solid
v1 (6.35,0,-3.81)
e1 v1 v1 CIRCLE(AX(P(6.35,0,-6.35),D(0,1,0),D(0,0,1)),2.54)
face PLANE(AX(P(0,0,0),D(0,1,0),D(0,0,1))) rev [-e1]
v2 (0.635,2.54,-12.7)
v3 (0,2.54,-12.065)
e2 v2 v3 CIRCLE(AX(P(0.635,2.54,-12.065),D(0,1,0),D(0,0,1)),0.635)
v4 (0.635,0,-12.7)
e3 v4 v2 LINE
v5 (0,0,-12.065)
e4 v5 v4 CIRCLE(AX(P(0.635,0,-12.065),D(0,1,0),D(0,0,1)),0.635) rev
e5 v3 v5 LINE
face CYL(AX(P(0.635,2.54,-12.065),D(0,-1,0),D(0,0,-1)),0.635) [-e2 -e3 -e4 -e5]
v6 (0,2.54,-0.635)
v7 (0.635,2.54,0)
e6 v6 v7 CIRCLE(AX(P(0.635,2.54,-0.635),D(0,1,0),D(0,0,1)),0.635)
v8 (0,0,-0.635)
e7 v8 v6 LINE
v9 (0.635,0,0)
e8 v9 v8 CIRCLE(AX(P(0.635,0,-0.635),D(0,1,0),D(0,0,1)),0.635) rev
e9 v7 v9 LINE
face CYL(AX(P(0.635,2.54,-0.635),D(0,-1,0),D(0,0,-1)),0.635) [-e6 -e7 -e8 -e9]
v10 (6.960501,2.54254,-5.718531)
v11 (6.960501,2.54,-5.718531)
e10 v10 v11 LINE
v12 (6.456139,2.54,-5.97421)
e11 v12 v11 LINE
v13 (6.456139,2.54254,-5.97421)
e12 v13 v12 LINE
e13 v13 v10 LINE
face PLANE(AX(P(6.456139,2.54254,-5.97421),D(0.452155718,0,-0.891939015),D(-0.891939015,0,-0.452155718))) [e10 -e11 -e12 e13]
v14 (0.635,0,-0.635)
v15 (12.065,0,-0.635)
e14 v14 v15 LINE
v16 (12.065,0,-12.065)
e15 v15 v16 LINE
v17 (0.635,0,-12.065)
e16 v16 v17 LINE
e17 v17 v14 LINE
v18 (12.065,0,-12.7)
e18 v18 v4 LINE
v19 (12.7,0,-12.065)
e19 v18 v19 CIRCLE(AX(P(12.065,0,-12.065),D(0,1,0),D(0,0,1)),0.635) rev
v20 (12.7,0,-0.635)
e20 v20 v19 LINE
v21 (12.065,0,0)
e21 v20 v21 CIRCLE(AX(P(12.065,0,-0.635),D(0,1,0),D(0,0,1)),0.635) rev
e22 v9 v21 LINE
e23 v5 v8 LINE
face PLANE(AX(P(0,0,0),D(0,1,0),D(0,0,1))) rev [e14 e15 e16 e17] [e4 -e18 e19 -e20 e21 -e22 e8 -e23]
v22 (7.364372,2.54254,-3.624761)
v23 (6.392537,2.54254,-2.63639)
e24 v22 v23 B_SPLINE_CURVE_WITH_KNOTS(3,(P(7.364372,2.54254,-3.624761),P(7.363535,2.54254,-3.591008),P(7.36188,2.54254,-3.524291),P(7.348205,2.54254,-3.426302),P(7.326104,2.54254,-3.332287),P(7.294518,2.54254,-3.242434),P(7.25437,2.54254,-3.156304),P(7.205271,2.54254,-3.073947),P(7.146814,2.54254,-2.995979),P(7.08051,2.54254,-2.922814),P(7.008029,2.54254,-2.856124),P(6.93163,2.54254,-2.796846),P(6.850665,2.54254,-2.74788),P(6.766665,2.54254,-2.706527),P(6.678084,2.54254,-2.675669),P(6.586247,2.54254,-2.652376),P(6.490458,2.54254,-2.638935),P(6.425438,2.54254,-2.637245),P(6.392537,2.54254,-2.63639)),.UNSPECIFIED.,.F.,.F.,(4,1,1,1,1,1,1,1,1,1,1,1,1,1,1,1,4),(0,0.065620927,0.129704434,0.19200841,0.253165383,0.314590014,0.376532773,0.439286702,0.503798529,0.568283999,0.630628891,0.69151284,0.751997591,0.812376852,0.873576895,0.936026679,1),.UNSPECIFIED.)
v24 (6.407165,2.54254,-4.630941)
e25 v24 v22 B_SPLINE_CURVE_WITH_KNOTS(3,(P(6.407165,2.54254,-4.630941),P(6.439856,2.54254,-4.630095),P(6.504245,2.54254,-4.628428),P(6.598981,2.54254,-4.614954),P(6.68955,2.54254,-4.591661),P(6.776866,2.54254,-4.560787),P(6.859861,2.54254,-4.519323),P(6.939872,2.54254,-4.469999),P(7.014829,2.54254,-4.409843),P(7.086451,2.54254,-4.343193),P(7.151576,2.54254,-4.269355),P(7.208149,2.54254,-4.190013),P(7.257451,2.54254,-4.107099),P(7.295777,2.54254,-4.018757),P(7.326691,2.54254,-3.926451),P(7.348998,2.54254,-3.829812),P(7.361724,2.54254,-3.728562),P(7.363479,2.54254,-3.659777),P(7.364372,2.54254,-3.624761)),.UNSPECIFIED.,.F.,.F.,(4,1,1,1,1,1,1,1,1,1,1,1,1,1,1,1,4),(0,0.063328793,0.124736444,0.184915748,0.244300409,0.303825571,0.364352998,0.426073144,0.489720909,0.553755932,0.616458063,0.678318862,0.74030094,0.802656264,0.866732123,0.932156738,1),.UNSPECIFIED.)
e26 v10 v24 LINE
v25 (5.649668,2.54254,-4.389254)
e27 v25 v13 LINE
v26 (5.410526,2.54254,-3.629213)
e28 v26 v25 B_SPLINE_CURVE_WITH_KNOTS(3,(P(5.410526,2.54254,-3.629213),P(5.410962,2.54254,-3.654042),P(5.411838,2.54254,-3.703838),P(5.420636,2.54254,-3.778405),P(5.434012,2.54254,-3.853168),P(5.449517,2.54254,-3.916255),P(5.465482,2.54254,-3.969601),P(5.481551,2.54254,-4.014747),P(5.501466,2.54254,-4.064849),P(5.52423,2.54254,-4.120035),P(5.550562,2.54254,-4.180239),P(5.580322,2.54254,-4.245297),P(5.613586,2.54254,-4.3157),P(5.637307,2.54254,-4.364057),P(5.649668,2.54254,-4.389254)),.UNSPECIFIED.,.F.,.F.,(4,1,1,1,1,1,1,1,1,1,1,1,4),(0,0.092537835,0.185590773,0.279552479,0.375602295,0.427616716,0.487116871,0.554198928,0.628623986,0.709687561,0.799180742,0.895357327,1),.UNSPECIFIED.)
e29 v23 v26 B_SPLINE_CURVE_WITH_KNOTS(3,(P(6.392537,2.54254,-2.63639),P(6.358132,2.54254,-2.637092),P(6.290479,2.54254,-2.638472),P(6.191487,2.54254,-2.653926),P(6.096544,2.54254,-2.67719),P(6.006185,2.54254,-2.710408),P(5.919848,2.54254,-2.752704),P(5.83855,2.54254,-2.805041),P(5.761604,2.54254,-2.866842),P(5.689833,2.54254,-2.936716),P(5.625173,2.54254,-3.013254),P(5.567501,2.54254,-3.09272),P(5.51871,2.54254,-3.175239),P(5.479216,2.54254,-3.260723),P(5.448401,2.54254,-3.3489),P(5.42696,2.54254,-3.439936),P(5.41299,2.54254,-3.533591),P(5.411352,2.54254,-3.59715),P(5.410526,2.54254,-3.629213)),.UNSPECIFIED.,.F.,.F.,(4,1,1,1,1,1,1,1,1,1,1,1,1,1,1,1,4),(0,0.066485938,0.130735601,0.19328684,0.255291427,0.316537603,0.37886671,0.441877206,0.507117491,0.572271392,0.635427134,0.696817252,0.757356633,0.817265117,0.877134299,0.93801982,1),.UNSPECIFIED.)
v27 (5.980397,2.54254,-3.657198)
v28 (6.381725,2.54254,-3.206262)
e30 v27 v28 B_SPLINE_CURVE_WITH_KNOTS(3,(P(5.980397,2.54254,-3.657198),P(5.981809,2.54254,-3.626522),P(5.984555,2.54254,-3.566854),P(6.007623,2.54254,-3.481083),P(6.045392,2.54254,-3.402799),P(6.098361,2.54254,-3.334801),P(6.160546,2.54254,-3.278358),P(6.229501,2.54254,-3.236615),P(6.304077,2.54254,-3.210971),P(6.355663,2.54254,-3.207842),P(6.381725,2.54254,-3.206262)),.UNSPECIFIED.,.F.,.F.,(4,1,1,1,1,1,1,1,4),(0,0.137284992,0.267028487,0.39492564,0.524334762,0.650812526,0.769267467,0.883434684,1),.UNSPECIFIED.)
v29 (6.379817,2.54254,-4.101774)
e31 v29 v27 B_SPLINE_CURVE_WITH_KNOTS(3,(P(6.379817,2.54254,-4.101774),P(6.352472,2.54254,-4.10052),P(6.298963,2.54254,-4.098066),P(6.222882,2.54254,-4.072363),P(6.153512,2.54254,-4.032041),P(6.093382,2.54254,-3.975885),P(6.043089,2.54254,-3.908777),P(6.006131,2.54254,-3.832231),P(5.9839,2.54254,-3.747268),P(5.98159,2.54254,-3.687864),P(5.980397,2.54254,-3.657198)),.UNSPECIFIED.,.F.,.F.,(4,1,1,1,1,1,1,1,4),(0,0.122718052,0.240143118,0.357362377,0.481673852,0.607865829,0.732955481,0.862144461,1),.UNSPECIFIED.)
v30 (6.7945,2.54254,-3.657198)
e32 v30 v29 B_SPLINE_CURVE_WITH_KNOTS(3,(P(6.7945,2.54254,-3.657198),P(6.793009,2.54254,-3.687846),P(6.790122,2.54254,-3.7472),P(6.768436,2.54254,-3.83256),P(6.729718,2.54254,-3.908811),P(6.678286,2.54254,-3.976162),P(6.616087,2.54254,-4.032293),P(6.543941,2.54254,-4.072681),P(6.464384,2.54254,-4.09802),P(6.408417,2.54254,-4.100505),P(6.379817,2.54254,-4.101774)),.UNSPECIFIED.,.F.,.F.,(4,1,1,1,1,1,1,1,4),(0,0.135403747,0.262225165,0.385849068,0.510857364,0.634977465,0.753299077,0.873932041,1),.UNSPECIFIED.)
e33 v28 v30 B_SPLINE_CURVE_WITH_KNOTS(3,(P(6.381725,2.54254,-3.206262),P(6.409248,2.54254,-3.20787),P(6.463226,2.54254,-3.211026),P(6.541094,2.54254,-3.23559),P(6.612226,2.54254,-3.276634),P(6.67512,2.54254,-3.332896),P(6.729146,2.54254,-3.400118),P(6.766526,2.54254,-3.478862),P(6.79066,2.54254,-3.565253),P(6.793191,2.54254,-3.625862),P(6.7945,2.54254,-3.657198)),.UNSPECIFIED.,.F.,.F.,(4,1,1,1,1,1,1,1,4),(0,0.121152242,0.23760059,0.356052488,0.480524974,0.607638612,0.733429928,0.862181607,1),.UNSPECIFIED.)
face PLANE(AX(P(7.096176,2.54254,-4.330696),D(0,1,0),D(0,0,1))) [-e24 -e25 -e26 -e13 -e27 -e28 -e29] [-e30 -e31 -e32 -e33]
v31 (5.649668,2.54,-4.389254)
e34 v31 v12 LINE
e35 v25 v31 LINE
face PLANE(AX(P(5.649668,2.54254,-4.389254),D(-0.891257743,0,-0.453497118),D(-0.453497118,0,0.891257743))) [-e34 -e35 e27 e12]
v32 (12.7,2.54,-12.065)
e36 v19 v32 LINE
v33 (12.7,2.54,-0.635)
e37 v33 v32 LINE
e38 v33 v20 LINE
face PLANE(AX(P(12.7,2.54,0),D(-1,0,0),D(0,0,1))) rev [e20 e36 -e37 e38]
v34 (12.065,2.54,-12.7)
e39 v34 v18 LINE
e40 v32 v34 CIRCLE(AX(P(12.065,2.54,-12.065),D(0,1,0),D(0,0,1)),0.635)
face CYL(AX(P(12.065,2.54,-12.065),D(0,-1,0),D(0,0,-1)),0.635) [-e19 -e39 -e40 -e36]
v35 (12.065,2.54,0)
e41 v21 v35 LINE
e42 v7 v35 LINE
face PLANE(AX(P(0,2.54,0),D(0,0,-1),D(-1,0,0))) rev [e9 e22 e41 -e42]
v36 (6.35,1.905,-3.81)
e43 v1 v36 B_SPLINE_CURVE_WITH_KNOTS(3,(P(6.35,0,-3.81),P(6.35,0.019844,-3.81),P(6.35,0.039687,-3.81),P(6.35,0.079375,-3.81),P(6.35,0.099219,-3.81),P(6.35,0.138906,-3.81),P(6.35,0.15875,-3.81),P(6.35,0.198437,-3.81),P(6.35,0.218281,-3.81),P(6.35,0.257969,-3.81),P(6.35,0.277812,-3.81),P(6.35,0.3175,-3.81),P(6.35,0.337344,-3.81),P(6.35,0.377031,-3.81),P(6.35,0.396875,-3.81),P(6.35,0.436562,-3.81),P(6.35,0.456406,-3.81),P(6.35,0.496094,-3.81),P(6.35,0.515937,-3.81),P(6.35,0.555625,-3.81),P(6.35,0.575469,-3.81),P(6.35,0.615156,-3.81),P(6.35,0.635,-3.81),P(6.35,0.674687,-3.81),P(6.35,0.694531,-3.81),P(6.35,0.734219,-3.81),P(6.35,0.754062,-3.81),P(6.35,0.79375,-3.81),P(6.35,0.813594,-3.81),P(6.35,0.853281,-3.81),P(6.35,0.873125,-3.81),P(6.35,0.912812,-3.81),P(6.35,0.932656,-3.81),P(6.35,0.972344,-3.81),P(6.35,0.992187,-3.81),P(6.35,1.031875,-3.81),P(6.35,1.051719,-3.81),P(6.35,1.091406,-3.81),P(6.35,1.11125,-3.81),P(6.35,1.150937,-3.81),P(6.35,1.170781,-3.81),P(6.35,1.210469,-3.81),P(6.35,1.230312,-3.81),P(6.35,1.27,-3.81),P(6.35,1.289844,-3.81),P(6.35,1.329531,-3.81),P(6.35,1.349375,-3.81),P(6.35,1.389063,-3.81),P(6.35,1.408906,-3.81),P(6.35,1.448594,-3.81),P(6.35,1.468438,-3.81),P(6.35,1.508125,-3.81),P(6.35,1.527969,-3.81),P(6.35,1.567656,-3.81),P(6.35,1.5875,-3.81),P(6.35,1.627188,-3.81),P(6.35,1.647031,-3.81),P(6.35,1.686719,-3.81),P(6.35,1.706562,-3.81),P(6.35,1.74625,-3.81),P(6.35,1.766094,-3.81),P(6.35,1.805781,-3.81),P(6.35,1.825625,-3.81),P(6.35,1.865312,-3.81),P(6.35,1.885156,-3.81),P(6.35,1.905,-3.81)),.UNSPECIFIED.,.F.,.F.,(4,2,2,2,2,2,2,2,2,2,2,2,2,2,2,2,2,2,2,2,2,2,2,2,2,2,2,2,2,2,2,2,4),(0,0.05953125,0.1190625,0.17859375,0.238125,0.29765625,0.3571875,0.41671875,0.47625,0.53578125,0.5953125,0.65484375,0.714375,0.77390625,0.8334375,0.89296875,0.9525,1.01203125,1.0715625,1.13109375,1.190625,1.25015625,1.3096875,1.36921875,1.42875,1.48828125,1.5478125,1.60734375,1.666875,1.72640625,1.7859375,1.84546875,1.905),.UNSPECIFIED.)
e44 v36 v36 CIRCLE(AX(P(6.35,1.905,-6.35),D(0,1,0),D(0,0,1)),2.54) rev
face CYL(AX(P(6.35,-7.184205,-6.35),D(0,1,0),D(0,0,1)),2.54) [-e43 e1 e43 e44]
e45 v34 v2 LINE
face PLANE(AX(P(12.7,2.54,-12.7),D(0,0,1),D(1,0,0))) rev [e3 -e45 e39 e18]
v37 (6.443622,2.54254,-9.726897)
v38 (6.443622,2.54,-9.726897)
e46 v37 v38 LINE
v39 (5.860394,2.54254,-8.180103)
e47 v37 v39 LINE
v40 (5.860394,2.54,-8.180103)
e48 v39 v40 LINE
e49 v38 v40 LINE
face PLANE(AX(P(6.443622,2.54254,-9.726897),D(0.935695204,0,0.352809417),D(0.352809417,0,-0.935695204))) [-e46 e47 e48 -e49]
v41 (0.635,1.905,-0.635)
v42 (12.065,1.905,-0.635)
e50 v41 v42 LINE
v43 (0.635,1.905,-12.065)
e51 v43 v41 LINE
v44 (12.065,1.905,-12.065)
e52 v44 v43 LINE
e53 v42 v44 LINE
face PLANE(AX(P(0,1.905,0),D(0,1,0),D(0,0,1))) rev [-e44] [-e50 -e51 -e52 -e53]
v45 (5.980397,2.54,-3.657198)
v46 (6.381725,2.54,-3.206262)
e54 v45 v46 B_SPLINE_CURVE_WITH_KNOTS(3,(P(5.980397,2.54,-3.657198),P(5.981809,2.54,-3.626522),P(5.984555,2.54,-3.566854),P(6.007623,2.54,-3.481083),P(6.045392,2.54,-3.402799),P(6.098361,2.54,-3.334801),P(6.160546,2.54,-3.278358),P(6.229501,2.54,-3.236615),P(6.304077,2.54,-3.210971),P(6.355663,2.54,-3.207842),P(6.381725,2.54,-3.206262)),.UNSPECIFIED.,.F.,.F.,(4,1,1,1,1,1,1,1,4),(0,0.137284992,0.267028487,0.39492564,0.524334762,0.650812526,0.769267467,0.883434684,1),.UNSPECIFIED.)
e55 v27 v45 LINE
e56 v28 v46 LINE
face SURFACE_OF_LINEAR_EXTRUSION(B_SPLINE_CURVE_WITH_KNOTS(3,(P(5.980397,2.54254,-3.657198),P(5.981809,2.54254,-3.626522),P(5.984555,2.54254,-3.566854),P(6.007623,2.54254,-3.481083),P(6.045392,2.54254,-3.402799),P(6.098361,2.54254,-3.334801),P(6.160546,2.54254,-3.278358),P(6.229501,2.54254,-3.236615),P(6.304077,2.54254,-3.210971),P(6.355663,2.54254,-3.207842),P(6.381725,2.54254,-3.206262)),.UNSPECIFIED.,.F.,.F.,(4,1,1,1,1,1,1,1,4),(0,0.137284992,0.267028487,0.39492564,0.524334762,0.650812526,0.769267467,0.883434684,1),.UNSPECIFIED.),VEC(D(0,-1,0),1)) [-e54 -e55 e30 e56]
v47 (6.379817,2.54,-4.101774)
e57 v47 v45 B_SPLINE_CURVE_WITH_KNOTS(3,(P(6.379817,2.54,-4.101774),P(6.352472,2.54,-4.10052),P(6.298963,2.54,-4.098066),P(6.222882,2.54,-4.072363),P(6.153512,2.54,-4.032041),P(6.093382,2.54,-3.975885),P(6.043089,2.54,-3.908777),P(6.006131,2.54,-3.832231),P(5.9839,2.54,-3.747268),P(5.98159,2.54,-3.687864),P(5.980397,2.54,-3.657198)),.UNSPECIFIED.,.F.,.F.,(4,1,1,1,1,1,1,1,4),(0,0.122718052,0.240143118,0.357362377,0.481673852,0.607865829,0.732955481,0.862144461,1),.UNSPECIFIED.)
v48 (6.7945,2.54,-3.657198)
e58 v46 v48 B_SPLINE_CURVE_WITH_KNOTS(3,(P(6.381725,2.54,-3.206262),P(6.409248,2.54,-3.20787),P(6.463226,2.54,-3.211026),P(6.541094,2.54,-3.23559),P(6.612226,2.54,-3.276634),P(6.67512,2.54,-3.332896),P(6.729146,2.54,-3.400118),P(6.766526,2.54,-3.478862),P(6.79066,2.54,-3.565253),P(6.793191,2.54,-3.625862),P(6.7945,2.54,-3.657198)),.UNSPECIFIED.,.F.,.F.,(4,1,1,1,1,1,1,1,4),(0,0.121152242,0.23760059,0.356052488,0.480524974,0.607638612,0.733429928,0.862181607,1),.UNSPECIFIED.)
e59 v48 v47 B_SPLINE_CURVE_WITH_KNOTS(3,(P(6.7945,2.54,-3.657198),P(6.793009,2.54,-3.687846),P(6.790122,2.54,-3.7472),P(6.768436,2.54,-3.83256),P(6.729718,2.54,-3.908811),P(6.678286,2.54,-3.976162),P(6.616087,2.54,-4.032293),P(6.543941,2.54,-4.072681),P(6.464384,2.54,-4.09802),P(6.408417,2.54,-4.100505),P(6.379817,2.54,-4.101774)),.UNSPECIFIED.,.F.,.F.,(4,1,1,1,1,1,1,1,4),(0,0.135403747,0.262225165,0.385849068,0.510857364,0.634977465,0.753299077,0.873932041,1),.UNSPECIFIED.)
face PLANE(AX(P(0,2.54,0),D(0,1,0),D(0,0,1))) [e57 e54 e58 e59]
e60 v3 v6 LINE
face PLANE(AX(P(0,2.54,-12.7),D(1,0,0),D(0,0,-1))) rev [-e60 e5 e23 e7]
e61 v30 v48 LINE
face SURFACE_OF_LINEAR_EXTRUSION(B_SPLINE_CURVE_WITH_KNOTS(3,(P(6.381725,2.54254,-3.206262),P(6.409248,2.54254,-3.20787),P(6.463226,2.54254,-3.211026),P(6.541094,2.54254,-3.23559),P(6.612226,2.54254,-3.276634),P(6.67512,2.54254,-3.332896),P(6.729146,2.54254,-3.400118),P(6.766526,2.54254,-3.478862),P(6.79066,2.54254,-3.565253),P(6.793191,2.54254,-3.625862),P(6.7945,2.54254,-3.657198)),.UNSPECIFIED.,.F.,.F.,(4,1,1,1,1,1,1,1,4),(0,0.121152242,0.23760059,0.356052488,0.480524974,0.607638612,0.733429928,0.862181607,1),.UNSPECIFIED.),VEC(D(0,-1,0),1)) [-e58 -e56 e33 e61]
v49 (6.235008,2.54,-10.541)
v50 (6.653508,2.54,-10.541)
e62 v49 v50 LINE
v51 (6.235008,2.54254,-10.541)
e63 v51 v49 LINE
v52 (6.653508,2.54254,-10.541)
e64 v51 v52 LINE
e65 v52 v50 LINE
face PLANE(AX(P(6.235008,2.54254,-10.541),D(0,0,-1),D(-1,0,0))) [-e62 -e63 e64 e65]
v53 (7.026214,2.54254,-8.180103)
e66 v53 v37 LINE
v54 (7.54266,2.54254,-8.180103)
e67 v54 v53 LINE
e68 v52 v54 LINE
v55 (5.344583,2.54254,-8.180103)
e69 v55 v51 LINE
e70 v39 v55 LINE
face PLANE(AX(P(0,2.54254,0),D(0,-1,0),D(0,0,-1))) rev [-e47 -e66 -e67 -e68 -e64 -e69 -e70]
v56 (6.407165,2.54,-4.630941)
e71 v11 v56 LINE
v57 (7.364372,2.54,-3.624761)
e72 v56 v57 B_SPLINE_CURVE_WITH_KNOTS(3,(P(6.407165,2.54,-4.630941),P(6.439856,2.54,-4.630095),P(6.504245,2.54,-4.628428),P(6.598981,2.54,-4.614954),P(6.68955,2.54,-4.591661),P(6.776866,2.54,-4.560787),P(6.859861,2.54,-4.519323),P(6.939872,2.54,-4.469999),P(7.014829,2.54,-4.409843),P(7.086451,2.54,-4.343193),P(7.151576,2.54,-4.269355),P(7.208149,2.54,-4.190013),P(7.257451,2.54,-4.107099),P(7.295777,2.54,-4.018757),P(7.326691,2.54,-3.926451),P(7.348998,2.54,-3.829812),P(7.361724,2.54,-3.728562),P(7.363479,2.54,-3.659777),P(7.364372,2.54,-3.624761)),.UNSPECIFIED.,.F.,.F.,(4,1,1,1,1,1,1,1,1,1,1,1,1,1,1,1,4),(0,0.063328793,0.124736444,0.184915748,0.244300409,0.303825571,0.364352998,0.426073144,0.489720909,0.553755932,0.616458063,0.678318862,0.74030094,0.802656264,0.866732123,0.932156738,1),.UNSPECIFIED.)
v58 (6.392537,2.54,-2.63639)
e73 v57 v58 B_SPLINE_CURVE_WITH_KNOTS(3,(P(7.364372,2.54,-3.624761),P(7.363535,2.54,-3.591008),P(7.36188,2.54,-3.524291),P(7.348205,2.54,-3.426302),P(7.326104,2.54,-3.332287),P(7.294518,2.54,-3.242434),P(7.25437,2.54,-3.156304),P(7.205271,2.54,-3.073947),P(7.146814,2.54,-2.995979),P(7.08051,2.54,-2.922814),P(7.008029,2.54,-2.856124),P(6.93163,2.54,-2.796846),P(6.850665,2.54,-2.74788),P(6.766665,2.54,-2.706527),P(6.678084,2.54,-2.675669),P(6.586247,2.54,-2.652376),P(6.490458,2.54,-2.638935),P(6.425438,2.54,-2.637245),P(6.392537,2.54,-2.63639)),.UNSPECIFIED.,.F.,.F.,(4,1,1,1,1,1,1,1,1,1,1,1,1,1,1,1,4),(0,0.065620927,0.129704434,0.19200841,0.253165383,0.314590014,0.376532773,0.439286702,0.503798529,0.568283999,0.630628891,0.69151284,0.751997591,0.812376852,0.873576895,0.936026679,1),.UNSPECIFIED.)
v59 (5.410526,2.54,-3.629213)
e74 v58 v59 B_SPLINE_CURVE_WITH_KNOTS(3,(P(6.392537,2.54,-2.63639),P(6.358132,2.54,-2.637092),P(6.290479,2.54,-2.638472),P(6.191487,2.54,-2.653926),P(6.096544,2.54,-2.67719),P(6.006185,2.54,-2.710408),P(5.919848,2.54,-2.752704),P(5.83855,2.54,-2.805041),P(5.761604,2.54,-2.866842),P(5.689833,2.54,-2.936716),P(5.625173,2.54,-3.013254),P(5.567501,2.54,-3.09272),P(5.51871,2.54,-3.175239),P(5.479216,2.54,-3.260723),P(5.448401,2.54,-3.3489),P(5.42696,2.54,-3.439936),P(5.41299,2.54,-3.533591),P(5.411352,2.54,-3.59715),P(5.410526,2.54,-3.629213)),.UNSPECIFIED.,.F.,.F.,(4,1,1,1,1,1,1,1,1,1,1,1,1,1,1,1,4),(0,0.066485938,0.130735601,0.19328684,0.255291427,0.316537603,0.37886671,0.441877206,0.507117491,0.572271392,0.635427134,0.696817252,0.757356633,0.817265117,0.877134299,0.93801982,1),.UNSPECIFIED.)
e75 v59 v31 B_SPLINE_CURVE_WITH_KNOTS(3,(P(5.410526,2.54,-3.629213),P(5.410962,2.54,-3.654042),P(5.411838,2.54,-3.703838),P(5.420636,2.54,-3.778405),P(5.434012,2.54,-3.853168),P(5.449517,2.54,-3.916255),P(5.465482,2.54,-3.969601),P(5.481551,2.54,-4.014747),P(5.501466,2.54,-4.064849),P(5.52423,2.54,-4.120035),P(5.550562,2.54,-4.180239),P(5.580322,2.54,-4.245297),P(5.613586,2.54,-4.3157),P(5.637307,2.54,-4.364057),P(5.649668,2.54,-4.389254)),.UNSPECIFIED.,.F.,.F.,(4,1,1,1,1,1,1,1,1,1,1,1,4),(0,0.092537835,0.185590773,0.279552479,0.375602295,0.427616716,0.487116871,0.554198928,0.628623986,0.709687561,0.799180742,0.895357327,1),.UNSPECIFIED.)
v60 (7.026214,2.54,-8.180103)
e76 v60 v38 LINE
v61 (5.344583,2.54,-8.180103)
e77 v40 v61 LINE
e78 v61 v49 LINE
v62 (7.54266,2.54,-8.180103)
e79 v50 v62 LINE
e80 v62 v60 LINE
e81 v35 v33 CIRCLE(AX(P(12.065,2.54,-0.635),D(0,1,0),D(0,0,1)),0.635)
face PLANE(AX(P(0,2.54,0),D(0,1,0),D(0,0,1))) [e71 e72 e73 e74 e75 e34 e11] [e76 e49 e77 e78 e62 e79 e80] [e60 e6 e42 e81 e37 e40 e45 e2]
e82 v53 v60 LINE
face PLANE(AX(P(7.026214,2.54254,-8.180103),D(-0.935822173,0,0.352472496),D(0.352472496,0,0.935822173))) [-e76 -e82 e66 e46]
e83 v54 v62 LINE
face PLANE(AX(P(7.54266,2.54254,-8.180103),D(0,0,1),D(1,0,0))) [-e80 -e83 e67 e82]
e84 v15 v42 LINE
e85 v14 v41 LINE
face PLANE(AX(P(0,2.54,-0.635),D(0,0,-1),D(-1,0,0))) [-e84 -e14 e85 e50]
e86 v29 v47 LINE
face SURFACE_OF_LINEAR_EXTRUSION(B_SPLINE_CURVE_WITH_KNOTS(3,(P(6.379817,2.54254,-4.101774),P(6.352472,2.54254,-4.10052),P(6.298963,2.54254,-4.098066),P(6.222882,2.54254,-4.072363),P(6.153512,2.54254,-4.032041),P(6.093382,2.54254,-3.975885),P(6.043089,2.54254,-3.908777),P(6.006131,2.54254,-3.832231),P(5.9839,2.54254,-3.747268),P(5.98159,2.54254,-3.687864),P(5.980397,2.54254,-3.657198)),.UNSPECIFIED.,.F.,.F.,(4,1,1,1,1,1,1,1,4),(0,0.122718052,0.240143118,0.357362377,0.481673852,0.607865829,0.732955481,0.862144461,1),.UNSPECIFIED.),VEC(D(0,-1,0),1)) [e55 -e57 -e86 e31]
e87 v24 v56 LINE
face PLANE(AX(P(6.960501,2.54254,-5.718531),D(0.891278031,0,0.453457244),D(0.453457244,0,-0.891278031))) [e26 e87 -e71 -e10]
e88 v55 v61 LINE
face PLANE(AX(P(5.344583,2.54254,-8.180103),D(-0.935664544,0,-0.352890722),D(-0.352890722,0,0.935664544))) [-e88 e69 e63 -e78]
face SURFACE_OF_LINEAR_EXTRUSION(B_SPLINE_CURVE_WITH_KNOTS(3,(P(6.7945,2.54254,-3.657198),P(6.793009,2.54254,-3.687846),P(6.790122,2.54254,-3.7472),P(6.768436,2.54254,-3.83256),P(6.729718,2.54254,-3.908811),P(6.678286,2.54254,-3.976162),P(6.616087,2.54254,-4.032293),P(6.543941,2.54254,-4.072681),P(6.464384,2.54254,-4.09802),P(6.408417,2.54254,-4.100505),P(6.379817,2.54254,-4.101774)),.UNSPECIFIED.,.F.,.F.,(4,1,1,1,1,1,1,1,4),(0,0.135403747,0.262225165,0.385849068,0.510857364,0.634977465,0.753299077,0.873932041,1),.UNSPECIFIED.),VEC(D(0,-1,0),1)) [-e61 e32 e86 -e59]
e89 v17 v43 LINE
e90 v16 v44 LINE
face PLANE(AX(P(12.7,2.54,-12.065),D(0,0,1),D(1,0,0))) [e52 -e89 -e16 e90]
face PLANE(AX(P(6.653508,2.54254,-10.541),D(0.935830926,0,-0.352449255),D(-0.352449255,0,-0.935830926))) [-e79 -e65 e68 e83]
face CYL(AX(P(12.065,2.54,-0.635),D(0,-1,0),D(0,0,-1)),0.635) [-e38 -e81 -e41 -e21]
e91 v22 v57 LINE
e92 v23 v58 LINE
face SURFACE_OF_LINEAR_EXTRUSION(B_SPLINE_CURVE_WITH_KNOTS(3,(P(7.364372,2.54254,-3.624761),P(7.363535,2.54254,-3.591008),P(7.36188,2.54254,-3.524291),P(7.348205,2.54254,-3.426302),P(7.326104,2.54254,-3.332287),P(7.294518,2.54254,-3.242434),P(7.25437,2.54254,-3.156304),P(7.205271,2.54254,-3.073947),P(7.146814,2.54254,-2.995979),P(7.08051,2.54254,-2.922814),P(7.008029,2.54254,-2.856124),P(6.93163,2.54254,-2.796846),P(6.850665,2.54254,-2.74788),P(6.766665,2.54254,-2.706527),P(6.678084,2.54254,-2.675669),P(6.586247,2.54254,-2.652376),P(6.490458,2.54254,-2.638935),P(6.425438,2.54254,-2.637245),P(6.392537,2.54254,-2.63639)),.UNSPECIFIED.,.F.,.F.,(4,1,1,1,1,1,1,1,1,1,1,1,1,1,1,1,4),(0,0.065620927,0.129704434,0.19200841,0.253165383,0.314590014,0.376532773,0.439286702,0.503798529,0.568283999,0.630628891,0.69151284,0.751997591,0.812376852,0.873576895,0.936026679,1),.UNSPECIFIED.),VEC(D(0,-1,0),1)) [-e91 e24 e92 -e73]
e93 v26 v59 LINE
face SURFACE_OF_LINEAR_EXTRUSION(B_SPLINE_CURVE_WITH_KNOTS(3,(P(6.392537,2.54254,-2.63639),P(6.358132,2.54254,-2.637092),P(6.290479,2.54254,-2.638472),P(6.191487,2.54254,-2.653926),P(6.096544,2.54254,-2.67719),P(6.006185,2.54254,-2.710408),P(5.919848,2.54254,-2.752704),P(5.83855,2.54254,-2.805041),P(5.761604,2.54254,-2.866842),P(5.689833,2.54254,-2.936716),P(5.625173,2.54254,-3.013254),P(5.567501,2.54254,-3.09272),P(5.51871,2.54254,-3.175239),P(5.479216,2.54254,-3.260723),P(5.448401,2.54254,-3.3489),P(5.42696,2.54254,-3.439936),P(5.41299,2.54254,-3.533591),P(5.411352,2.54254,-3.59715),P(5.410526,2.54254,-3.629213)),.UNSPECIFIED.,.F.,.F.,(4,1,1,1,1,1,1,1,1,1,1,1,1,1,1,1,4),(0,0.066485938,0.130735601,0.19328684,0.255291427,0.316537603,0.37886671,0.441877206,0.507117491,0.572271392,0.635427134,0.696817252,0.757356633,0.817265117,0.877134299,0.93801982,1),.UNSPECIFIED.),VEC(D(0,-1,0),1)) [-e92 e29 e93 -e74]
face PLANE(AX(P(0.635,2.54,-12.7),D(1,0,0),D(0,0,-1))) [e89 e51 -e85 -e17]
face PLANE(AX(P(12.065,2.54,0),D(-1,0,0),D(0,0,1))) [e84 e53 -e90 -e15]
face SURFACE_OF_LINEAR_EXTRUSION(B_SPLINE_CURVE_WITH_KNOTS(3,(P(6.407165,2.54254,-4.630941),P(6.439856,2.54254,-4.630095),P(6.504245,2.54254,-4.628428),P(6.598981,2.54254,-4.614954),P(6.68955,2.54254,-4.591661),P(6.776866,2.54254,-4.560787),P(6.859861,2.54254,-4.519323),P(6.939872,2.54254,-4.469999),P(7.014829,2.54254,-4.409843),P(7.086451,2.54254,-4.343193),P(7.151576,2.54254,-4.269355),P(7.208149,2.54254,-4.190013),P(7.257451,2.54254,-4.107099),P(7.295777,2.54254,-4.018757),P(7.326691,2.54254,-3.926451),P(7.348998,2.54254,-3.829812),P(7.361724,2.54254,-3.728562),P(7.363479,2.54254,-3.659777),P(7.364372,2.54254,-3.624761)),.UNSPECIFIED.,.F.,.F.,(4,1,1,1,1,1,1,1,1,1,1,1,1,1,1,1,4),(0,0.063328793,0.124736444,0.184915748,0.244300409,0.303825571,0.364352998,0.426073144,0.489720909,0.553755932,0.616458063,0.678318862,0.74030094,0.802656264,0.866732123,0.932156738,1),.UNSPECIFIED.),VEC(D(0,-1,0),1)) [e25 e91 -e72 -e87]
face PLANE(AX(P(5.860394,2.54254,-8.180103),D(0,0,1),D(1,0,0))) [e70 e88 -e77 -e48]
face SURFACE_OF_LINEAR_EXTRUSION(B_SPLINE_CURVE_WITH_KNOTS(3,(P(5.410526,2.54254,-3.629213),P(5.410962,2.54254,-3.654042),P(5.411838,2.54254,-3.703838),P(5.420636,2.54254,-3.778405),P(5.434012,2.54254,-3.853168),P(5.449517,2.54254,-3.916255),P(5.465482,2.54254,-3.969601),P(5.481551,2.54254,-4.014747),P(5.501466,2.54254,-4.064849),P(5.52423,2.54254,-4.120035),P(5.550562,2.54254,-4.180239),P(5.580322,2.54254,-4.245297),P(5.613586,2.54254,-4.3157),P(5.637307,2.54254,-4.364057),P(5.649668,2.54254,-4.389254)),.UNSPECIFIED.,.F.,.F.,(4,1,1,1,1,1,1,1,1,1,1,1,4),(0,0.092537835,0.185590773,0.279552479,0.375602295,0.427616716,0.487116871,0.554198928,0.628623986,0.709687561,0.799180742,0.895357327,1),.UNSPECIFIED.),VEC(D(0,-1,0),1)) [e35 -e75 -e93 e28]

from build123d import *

# Parameters (mm, degrees)
SKETCH1_W           = 12.7
SKETCH1_H           = 12.7
BOSS_EXTRUDE1_DEPTH = 2.54
FILLET1_R           = 0.635
SHELL1_START        = 0.635
SHELL1_OUTLINE_W    = 1.905
SHELL1_OUTLINE_H    = 11.43
SHELL1_DEPTH        = 11.43
SKETCH2_R           = 2.54
BOSS_EXTRUDE2_DEPTH = 1.905
BOSS_EXTRUDE4_DEPTH = 0.00254


# Read off the part's stored shape, not the designer's step: Shell1
with BuildPart() as part:
    # Sketch1 → Boss-Extrude1 (new body)
    with BuildSketch(Plane(origin=(0, 0, 0), x_dir=(1, 0, 0), z_dir=(0, 1, 0))):
        with Locations((6.35, 6.35)):
            Rectangle(SKETCH1_W, SKETCH1_H)
    extrude(amount=BOSS_EXTRUDE1_DEPTH)

    # Fillet1
    fillet1_edges = [part.edges().sort_by_distance(p)[0] for p in [
        (0, 1.27, -12.7),
        (12.7, 1.27, -12.7),
        (12.7, 1.27, 0),
        (0, 1.27, 0),
    ]]
    fillet(fillet1_edges, radius=FILLET1_R)

    # Shell1 outline → Shell1 (cut)
    with BuildSketch(Plane.YZ.offset(SHELL1_START)):
        with Locations((0.9525, -6.35)):
            Rectangle(SHELL1_OUTLINE_W, SHELL1_OUTLINE_H)
    extrude(amount=SHELL1_DEPTH, mode=Mode.SUBTRACT)

    # Sketch2 → Boss-Extrude2 (add)
    with BuildSketch(Plane(origin=(0, 1.905, 0), x_dir=(-1, 0, 0), z_dir=(0, -1, 0))):
        with Locations(Location((-6.35, 6.35, 0), (0, 0, 270))):
            Circle(SKETCH2_R)
    extrude(amount=BOSS_EXTRUDE2_DEPTH)

    # Sketch4 → Boss-Extrude4 (add)
    # profile 1 of 2: a face of its own
    with BuildSketch(Plane(origin=(0, 2.54, 0), x_dir=(1, 0, 0), z_dir=(0, 1, 0))):
        with BuildLine():
            Line((6.456138622, 5.974210256), (6.960500601, 5.71853117))
            Line((6.960500601, 5.71853117), (6.407165264, 4.630941026))
            add(Edge.make_bspline(
                [(6.407165264, 4.630941026), (6.439855797, 4.630094651), (6.504245162, 4.628427578), (6.598981047, 4.614954014), (6.689550316, 4.591661453), (6.776866176, 4.560787227), (6.859861273, 4.519322834), (6.939872289, 4.469998775), (7.014829299, 4.40984278), (7.086451002, 4.34319313), (7.151576249, 4.269354895), (7.20814904, 4.190013367), (7.257451228, 4.107098934), (7.295776765, 4.018756598), (7.32669142, 3.926450736), (7.348997703, 3.82981236), (7.361724062, 3.728561626), (7.363478603, 3.659777417), (7.364371795, 3.624761138)],
                knots=[0, 0, 0, 0, 1.013260694, 1.995783107, 2.958651975, 3.908806537, 4.861209129, 5.829647963, 6.817170299, 7.835534541, 8.860094905, 9.863329007, 10.853101798, 11.844815043, 12.84250023, 13.867713965, 14.914507806, 16, 16, 16, 16], degree=3))
            add(Edge.make_bspline(
                [(7.364371795, 3.624761138), (7.3635348, 3.591007569), (7.361880421, 3.524291238), (7.348204784, 3.426301914), (7.326104237, 3.332286889), (7.294518118, 3.242433922), (7.254369605, 3.156303809), (7.205270694, 3.073947091), (7.146814203, 2.995979194), (7.080510488, 2.922814401), (7.008029089, 2.856124152), (6.931629747, 2.796845977), (6.850665063, 2.747879955), (6.766665364, 2.706527002), (6.678084165, 2.675668741), (6.586247088, 2.652376099), (6.490457705, 2.638935234), (6.425438326, 2.63724503), (6.392536859, 2.636389744)],
                knots=[0, 0, 0, 0, 1.049934834, 2.075270938, 3.072134561, 4.05064612, 5.033440221, 6.024524368, 7.028587226, 8.060776465, 9.092543989, 10.090062252, 11.064205434, 12.031961459, 12.998029633, 13.977230324, 14.976426867, 16, 16, 16, 16], degree=3))
            add(Edge.make_bspline(
                [(6.392536859, 2.636389744), (6.358131923, 2.637091632), (6.290479272, 2.6384718), (6.191486511, 2.653926046), (6.096543934, 2.677190259), (6.006185133, 2.710407602), (5.919848194, 2.752703587), (5.838549577, 2.805040616), (5.761604456, 2.866841549), (5.689833178, 2.936715965), (5.625172604, 3.013253826), (5.567500777, 3.092720054), (5.518710337, 3.175239347), (5.479215613, 3.260723478), (5.448400913, 3.348900047), (5.426960167, 3.439936406), (5.412989542, 3.53359108), (5.411351805, 3.597150442), (5.410525641, 3.629213261)],
                knots=[0, 0, 0, 0, 1.063775006, 2.091769615, 3.092589432, 4.084662827, 5.064601646, 6.061867366, 7.070035304, 8.113879863, 9.156342271, 10.166834137, 11.149076039, 12.117706134, 13.076241869, 14.034148791, 15.008317125, 16, 16, 16, 16], degree=3))
            add(Edge.make_bspline(
                [(5.410525641, 3.629213261), (5.41096217, 3.654042164), (5.411837658, 3.703838176), (5.420635786, 3.778404999), (5.434012031, 3.853167552), (5.449516851, 3.916254562), (5.465482147, 3.969601232), (5.481551341, 4.014747076), (5.501465566, 4.064849092), (5.524230475, 4.12003522), (5.550561942, 4.180239071), (5.580322415, 4.245296544), (5.613585986, 4.315700304), (5.637307493, 4.364056786), (5.649668269, 4.389254327)],
                knots=[0, 0, 0, 0, 1.110454016, 2.227089276, 3.35462975, 4.507227546, 5.131400587, 5.845402449, 6.650387134, 7.543487832, 8.516250726, 9.590168902, 10.744287919, 12, 12, 12, 12], degree=3))
            Line((5.649668269, 4.389254327), (6.456138622, 5.974210256))
        make_face()
        with BuildLine():
            add(Edge.make_bspline(
                [(6.379816506, 4.101774359), (6.352472323, 4.100520139), (6.298963346, 4.098065795), (6.222881583, 4.072362713), (6.153512277, 4.032040974), (6.093382105, 3.975885155), (6.043088748, 3.908776745), (6.006131425, 3.832230641), (5.983899541, 3.747268327), (5.981589791, 3.687864094), (5.980397436, 3.657198037)],
                knots=[0, 0, 0, 0, 0.981744412, 1.921144944, 2.858899012, 3.85339082, 4.86292663, 5.863643845, 6.897155691, 8, 8, 8, 8], degree=3))
            add(Edge.make_bspline(
                [(5.980397436, 3.657198037), (5.981809222, 3.626521768), (5.984555239, 3.566854373), (6.007623071, 3.481083067), (6.045392269, 3.402798689), (6.098361161, 3.334800948), (6.160545878, 3.278357558), (6.229501354, 3.236614972), (6.304077387, 3.210971132), (6.35566345, 3.207842243), (6.381724559, 3.206261538)],
                knots=[0, 0, 0, 0, 1.098279937, 2.136227893, 3.159405121, 4.194678092, 5.206500211, 6.154139736, 7.067477469, 8, 8, 8, 8], degree=3))
            add(Edge.make_bspline(
                [(6.381724559, 3.206261538), (6.409248036, 3.207870396), (6.463226355, 3.211025646), (6.54109362, 3.23559044), (6.612225834, 3.276633701), (6.67512047, 3.332896382), (6.729145767, 3.400118178), (6.766525816, 3.478862388), (6.790660084, 3.565252761), (6.79319133, 3.625862449), (6.7945, 3.657198037)],
                knots=[0, 0, 0, 0, 0.96921794, 1.900804717, 2.848419905, 3.844199796, 4.861108892, 5.867439427, 6.897452859, 8, 8, 8, 8], degree=3))
            add(Edge.make_bspline(
                [(6.7945, 3.657198037), (6.793009186, 3.687846189), (6.79012205, 3.747199913), (6.768436237, 3.832560256), (6.729717682, 3.908811323), (6.678286397, 3.976162168), (6.616086864, 4.032292947), (6.543941256, 4.072680703), (6.464383952, 4.098020258), (6.408416654, 4.100504747), (6.379816506, 4.101774359)],
                knots=[0, 0, 0, 0, 1.083229974, 2.097801324, 3.086792542, 4.086858909, 5.079819718, 6.026392613, 6.991456328, 8, 8, 8, 8], degree=3))
        make_face(mode=Mode.SUBTRACT)
    # profile 2 of 2: a face of its own
    with BuildSketch(Plane(origin=(0, 2.54, 0), x_dir=(1, 0, 0), z_dir=(0, 1, 0))):
        Polygon((6.235008013, 10.541), (6.653507612, 10.541), (7.542660256, 8.180102564), (7.026213942, 8.180102564), (6.443621795, 9.726897436), (5.86039363, 8.180102564), (5.344583333, 8.180102564), align=None)
    extrude(amount=BOSS_EXTRUDE4_DEPTH)


solid = part.part
